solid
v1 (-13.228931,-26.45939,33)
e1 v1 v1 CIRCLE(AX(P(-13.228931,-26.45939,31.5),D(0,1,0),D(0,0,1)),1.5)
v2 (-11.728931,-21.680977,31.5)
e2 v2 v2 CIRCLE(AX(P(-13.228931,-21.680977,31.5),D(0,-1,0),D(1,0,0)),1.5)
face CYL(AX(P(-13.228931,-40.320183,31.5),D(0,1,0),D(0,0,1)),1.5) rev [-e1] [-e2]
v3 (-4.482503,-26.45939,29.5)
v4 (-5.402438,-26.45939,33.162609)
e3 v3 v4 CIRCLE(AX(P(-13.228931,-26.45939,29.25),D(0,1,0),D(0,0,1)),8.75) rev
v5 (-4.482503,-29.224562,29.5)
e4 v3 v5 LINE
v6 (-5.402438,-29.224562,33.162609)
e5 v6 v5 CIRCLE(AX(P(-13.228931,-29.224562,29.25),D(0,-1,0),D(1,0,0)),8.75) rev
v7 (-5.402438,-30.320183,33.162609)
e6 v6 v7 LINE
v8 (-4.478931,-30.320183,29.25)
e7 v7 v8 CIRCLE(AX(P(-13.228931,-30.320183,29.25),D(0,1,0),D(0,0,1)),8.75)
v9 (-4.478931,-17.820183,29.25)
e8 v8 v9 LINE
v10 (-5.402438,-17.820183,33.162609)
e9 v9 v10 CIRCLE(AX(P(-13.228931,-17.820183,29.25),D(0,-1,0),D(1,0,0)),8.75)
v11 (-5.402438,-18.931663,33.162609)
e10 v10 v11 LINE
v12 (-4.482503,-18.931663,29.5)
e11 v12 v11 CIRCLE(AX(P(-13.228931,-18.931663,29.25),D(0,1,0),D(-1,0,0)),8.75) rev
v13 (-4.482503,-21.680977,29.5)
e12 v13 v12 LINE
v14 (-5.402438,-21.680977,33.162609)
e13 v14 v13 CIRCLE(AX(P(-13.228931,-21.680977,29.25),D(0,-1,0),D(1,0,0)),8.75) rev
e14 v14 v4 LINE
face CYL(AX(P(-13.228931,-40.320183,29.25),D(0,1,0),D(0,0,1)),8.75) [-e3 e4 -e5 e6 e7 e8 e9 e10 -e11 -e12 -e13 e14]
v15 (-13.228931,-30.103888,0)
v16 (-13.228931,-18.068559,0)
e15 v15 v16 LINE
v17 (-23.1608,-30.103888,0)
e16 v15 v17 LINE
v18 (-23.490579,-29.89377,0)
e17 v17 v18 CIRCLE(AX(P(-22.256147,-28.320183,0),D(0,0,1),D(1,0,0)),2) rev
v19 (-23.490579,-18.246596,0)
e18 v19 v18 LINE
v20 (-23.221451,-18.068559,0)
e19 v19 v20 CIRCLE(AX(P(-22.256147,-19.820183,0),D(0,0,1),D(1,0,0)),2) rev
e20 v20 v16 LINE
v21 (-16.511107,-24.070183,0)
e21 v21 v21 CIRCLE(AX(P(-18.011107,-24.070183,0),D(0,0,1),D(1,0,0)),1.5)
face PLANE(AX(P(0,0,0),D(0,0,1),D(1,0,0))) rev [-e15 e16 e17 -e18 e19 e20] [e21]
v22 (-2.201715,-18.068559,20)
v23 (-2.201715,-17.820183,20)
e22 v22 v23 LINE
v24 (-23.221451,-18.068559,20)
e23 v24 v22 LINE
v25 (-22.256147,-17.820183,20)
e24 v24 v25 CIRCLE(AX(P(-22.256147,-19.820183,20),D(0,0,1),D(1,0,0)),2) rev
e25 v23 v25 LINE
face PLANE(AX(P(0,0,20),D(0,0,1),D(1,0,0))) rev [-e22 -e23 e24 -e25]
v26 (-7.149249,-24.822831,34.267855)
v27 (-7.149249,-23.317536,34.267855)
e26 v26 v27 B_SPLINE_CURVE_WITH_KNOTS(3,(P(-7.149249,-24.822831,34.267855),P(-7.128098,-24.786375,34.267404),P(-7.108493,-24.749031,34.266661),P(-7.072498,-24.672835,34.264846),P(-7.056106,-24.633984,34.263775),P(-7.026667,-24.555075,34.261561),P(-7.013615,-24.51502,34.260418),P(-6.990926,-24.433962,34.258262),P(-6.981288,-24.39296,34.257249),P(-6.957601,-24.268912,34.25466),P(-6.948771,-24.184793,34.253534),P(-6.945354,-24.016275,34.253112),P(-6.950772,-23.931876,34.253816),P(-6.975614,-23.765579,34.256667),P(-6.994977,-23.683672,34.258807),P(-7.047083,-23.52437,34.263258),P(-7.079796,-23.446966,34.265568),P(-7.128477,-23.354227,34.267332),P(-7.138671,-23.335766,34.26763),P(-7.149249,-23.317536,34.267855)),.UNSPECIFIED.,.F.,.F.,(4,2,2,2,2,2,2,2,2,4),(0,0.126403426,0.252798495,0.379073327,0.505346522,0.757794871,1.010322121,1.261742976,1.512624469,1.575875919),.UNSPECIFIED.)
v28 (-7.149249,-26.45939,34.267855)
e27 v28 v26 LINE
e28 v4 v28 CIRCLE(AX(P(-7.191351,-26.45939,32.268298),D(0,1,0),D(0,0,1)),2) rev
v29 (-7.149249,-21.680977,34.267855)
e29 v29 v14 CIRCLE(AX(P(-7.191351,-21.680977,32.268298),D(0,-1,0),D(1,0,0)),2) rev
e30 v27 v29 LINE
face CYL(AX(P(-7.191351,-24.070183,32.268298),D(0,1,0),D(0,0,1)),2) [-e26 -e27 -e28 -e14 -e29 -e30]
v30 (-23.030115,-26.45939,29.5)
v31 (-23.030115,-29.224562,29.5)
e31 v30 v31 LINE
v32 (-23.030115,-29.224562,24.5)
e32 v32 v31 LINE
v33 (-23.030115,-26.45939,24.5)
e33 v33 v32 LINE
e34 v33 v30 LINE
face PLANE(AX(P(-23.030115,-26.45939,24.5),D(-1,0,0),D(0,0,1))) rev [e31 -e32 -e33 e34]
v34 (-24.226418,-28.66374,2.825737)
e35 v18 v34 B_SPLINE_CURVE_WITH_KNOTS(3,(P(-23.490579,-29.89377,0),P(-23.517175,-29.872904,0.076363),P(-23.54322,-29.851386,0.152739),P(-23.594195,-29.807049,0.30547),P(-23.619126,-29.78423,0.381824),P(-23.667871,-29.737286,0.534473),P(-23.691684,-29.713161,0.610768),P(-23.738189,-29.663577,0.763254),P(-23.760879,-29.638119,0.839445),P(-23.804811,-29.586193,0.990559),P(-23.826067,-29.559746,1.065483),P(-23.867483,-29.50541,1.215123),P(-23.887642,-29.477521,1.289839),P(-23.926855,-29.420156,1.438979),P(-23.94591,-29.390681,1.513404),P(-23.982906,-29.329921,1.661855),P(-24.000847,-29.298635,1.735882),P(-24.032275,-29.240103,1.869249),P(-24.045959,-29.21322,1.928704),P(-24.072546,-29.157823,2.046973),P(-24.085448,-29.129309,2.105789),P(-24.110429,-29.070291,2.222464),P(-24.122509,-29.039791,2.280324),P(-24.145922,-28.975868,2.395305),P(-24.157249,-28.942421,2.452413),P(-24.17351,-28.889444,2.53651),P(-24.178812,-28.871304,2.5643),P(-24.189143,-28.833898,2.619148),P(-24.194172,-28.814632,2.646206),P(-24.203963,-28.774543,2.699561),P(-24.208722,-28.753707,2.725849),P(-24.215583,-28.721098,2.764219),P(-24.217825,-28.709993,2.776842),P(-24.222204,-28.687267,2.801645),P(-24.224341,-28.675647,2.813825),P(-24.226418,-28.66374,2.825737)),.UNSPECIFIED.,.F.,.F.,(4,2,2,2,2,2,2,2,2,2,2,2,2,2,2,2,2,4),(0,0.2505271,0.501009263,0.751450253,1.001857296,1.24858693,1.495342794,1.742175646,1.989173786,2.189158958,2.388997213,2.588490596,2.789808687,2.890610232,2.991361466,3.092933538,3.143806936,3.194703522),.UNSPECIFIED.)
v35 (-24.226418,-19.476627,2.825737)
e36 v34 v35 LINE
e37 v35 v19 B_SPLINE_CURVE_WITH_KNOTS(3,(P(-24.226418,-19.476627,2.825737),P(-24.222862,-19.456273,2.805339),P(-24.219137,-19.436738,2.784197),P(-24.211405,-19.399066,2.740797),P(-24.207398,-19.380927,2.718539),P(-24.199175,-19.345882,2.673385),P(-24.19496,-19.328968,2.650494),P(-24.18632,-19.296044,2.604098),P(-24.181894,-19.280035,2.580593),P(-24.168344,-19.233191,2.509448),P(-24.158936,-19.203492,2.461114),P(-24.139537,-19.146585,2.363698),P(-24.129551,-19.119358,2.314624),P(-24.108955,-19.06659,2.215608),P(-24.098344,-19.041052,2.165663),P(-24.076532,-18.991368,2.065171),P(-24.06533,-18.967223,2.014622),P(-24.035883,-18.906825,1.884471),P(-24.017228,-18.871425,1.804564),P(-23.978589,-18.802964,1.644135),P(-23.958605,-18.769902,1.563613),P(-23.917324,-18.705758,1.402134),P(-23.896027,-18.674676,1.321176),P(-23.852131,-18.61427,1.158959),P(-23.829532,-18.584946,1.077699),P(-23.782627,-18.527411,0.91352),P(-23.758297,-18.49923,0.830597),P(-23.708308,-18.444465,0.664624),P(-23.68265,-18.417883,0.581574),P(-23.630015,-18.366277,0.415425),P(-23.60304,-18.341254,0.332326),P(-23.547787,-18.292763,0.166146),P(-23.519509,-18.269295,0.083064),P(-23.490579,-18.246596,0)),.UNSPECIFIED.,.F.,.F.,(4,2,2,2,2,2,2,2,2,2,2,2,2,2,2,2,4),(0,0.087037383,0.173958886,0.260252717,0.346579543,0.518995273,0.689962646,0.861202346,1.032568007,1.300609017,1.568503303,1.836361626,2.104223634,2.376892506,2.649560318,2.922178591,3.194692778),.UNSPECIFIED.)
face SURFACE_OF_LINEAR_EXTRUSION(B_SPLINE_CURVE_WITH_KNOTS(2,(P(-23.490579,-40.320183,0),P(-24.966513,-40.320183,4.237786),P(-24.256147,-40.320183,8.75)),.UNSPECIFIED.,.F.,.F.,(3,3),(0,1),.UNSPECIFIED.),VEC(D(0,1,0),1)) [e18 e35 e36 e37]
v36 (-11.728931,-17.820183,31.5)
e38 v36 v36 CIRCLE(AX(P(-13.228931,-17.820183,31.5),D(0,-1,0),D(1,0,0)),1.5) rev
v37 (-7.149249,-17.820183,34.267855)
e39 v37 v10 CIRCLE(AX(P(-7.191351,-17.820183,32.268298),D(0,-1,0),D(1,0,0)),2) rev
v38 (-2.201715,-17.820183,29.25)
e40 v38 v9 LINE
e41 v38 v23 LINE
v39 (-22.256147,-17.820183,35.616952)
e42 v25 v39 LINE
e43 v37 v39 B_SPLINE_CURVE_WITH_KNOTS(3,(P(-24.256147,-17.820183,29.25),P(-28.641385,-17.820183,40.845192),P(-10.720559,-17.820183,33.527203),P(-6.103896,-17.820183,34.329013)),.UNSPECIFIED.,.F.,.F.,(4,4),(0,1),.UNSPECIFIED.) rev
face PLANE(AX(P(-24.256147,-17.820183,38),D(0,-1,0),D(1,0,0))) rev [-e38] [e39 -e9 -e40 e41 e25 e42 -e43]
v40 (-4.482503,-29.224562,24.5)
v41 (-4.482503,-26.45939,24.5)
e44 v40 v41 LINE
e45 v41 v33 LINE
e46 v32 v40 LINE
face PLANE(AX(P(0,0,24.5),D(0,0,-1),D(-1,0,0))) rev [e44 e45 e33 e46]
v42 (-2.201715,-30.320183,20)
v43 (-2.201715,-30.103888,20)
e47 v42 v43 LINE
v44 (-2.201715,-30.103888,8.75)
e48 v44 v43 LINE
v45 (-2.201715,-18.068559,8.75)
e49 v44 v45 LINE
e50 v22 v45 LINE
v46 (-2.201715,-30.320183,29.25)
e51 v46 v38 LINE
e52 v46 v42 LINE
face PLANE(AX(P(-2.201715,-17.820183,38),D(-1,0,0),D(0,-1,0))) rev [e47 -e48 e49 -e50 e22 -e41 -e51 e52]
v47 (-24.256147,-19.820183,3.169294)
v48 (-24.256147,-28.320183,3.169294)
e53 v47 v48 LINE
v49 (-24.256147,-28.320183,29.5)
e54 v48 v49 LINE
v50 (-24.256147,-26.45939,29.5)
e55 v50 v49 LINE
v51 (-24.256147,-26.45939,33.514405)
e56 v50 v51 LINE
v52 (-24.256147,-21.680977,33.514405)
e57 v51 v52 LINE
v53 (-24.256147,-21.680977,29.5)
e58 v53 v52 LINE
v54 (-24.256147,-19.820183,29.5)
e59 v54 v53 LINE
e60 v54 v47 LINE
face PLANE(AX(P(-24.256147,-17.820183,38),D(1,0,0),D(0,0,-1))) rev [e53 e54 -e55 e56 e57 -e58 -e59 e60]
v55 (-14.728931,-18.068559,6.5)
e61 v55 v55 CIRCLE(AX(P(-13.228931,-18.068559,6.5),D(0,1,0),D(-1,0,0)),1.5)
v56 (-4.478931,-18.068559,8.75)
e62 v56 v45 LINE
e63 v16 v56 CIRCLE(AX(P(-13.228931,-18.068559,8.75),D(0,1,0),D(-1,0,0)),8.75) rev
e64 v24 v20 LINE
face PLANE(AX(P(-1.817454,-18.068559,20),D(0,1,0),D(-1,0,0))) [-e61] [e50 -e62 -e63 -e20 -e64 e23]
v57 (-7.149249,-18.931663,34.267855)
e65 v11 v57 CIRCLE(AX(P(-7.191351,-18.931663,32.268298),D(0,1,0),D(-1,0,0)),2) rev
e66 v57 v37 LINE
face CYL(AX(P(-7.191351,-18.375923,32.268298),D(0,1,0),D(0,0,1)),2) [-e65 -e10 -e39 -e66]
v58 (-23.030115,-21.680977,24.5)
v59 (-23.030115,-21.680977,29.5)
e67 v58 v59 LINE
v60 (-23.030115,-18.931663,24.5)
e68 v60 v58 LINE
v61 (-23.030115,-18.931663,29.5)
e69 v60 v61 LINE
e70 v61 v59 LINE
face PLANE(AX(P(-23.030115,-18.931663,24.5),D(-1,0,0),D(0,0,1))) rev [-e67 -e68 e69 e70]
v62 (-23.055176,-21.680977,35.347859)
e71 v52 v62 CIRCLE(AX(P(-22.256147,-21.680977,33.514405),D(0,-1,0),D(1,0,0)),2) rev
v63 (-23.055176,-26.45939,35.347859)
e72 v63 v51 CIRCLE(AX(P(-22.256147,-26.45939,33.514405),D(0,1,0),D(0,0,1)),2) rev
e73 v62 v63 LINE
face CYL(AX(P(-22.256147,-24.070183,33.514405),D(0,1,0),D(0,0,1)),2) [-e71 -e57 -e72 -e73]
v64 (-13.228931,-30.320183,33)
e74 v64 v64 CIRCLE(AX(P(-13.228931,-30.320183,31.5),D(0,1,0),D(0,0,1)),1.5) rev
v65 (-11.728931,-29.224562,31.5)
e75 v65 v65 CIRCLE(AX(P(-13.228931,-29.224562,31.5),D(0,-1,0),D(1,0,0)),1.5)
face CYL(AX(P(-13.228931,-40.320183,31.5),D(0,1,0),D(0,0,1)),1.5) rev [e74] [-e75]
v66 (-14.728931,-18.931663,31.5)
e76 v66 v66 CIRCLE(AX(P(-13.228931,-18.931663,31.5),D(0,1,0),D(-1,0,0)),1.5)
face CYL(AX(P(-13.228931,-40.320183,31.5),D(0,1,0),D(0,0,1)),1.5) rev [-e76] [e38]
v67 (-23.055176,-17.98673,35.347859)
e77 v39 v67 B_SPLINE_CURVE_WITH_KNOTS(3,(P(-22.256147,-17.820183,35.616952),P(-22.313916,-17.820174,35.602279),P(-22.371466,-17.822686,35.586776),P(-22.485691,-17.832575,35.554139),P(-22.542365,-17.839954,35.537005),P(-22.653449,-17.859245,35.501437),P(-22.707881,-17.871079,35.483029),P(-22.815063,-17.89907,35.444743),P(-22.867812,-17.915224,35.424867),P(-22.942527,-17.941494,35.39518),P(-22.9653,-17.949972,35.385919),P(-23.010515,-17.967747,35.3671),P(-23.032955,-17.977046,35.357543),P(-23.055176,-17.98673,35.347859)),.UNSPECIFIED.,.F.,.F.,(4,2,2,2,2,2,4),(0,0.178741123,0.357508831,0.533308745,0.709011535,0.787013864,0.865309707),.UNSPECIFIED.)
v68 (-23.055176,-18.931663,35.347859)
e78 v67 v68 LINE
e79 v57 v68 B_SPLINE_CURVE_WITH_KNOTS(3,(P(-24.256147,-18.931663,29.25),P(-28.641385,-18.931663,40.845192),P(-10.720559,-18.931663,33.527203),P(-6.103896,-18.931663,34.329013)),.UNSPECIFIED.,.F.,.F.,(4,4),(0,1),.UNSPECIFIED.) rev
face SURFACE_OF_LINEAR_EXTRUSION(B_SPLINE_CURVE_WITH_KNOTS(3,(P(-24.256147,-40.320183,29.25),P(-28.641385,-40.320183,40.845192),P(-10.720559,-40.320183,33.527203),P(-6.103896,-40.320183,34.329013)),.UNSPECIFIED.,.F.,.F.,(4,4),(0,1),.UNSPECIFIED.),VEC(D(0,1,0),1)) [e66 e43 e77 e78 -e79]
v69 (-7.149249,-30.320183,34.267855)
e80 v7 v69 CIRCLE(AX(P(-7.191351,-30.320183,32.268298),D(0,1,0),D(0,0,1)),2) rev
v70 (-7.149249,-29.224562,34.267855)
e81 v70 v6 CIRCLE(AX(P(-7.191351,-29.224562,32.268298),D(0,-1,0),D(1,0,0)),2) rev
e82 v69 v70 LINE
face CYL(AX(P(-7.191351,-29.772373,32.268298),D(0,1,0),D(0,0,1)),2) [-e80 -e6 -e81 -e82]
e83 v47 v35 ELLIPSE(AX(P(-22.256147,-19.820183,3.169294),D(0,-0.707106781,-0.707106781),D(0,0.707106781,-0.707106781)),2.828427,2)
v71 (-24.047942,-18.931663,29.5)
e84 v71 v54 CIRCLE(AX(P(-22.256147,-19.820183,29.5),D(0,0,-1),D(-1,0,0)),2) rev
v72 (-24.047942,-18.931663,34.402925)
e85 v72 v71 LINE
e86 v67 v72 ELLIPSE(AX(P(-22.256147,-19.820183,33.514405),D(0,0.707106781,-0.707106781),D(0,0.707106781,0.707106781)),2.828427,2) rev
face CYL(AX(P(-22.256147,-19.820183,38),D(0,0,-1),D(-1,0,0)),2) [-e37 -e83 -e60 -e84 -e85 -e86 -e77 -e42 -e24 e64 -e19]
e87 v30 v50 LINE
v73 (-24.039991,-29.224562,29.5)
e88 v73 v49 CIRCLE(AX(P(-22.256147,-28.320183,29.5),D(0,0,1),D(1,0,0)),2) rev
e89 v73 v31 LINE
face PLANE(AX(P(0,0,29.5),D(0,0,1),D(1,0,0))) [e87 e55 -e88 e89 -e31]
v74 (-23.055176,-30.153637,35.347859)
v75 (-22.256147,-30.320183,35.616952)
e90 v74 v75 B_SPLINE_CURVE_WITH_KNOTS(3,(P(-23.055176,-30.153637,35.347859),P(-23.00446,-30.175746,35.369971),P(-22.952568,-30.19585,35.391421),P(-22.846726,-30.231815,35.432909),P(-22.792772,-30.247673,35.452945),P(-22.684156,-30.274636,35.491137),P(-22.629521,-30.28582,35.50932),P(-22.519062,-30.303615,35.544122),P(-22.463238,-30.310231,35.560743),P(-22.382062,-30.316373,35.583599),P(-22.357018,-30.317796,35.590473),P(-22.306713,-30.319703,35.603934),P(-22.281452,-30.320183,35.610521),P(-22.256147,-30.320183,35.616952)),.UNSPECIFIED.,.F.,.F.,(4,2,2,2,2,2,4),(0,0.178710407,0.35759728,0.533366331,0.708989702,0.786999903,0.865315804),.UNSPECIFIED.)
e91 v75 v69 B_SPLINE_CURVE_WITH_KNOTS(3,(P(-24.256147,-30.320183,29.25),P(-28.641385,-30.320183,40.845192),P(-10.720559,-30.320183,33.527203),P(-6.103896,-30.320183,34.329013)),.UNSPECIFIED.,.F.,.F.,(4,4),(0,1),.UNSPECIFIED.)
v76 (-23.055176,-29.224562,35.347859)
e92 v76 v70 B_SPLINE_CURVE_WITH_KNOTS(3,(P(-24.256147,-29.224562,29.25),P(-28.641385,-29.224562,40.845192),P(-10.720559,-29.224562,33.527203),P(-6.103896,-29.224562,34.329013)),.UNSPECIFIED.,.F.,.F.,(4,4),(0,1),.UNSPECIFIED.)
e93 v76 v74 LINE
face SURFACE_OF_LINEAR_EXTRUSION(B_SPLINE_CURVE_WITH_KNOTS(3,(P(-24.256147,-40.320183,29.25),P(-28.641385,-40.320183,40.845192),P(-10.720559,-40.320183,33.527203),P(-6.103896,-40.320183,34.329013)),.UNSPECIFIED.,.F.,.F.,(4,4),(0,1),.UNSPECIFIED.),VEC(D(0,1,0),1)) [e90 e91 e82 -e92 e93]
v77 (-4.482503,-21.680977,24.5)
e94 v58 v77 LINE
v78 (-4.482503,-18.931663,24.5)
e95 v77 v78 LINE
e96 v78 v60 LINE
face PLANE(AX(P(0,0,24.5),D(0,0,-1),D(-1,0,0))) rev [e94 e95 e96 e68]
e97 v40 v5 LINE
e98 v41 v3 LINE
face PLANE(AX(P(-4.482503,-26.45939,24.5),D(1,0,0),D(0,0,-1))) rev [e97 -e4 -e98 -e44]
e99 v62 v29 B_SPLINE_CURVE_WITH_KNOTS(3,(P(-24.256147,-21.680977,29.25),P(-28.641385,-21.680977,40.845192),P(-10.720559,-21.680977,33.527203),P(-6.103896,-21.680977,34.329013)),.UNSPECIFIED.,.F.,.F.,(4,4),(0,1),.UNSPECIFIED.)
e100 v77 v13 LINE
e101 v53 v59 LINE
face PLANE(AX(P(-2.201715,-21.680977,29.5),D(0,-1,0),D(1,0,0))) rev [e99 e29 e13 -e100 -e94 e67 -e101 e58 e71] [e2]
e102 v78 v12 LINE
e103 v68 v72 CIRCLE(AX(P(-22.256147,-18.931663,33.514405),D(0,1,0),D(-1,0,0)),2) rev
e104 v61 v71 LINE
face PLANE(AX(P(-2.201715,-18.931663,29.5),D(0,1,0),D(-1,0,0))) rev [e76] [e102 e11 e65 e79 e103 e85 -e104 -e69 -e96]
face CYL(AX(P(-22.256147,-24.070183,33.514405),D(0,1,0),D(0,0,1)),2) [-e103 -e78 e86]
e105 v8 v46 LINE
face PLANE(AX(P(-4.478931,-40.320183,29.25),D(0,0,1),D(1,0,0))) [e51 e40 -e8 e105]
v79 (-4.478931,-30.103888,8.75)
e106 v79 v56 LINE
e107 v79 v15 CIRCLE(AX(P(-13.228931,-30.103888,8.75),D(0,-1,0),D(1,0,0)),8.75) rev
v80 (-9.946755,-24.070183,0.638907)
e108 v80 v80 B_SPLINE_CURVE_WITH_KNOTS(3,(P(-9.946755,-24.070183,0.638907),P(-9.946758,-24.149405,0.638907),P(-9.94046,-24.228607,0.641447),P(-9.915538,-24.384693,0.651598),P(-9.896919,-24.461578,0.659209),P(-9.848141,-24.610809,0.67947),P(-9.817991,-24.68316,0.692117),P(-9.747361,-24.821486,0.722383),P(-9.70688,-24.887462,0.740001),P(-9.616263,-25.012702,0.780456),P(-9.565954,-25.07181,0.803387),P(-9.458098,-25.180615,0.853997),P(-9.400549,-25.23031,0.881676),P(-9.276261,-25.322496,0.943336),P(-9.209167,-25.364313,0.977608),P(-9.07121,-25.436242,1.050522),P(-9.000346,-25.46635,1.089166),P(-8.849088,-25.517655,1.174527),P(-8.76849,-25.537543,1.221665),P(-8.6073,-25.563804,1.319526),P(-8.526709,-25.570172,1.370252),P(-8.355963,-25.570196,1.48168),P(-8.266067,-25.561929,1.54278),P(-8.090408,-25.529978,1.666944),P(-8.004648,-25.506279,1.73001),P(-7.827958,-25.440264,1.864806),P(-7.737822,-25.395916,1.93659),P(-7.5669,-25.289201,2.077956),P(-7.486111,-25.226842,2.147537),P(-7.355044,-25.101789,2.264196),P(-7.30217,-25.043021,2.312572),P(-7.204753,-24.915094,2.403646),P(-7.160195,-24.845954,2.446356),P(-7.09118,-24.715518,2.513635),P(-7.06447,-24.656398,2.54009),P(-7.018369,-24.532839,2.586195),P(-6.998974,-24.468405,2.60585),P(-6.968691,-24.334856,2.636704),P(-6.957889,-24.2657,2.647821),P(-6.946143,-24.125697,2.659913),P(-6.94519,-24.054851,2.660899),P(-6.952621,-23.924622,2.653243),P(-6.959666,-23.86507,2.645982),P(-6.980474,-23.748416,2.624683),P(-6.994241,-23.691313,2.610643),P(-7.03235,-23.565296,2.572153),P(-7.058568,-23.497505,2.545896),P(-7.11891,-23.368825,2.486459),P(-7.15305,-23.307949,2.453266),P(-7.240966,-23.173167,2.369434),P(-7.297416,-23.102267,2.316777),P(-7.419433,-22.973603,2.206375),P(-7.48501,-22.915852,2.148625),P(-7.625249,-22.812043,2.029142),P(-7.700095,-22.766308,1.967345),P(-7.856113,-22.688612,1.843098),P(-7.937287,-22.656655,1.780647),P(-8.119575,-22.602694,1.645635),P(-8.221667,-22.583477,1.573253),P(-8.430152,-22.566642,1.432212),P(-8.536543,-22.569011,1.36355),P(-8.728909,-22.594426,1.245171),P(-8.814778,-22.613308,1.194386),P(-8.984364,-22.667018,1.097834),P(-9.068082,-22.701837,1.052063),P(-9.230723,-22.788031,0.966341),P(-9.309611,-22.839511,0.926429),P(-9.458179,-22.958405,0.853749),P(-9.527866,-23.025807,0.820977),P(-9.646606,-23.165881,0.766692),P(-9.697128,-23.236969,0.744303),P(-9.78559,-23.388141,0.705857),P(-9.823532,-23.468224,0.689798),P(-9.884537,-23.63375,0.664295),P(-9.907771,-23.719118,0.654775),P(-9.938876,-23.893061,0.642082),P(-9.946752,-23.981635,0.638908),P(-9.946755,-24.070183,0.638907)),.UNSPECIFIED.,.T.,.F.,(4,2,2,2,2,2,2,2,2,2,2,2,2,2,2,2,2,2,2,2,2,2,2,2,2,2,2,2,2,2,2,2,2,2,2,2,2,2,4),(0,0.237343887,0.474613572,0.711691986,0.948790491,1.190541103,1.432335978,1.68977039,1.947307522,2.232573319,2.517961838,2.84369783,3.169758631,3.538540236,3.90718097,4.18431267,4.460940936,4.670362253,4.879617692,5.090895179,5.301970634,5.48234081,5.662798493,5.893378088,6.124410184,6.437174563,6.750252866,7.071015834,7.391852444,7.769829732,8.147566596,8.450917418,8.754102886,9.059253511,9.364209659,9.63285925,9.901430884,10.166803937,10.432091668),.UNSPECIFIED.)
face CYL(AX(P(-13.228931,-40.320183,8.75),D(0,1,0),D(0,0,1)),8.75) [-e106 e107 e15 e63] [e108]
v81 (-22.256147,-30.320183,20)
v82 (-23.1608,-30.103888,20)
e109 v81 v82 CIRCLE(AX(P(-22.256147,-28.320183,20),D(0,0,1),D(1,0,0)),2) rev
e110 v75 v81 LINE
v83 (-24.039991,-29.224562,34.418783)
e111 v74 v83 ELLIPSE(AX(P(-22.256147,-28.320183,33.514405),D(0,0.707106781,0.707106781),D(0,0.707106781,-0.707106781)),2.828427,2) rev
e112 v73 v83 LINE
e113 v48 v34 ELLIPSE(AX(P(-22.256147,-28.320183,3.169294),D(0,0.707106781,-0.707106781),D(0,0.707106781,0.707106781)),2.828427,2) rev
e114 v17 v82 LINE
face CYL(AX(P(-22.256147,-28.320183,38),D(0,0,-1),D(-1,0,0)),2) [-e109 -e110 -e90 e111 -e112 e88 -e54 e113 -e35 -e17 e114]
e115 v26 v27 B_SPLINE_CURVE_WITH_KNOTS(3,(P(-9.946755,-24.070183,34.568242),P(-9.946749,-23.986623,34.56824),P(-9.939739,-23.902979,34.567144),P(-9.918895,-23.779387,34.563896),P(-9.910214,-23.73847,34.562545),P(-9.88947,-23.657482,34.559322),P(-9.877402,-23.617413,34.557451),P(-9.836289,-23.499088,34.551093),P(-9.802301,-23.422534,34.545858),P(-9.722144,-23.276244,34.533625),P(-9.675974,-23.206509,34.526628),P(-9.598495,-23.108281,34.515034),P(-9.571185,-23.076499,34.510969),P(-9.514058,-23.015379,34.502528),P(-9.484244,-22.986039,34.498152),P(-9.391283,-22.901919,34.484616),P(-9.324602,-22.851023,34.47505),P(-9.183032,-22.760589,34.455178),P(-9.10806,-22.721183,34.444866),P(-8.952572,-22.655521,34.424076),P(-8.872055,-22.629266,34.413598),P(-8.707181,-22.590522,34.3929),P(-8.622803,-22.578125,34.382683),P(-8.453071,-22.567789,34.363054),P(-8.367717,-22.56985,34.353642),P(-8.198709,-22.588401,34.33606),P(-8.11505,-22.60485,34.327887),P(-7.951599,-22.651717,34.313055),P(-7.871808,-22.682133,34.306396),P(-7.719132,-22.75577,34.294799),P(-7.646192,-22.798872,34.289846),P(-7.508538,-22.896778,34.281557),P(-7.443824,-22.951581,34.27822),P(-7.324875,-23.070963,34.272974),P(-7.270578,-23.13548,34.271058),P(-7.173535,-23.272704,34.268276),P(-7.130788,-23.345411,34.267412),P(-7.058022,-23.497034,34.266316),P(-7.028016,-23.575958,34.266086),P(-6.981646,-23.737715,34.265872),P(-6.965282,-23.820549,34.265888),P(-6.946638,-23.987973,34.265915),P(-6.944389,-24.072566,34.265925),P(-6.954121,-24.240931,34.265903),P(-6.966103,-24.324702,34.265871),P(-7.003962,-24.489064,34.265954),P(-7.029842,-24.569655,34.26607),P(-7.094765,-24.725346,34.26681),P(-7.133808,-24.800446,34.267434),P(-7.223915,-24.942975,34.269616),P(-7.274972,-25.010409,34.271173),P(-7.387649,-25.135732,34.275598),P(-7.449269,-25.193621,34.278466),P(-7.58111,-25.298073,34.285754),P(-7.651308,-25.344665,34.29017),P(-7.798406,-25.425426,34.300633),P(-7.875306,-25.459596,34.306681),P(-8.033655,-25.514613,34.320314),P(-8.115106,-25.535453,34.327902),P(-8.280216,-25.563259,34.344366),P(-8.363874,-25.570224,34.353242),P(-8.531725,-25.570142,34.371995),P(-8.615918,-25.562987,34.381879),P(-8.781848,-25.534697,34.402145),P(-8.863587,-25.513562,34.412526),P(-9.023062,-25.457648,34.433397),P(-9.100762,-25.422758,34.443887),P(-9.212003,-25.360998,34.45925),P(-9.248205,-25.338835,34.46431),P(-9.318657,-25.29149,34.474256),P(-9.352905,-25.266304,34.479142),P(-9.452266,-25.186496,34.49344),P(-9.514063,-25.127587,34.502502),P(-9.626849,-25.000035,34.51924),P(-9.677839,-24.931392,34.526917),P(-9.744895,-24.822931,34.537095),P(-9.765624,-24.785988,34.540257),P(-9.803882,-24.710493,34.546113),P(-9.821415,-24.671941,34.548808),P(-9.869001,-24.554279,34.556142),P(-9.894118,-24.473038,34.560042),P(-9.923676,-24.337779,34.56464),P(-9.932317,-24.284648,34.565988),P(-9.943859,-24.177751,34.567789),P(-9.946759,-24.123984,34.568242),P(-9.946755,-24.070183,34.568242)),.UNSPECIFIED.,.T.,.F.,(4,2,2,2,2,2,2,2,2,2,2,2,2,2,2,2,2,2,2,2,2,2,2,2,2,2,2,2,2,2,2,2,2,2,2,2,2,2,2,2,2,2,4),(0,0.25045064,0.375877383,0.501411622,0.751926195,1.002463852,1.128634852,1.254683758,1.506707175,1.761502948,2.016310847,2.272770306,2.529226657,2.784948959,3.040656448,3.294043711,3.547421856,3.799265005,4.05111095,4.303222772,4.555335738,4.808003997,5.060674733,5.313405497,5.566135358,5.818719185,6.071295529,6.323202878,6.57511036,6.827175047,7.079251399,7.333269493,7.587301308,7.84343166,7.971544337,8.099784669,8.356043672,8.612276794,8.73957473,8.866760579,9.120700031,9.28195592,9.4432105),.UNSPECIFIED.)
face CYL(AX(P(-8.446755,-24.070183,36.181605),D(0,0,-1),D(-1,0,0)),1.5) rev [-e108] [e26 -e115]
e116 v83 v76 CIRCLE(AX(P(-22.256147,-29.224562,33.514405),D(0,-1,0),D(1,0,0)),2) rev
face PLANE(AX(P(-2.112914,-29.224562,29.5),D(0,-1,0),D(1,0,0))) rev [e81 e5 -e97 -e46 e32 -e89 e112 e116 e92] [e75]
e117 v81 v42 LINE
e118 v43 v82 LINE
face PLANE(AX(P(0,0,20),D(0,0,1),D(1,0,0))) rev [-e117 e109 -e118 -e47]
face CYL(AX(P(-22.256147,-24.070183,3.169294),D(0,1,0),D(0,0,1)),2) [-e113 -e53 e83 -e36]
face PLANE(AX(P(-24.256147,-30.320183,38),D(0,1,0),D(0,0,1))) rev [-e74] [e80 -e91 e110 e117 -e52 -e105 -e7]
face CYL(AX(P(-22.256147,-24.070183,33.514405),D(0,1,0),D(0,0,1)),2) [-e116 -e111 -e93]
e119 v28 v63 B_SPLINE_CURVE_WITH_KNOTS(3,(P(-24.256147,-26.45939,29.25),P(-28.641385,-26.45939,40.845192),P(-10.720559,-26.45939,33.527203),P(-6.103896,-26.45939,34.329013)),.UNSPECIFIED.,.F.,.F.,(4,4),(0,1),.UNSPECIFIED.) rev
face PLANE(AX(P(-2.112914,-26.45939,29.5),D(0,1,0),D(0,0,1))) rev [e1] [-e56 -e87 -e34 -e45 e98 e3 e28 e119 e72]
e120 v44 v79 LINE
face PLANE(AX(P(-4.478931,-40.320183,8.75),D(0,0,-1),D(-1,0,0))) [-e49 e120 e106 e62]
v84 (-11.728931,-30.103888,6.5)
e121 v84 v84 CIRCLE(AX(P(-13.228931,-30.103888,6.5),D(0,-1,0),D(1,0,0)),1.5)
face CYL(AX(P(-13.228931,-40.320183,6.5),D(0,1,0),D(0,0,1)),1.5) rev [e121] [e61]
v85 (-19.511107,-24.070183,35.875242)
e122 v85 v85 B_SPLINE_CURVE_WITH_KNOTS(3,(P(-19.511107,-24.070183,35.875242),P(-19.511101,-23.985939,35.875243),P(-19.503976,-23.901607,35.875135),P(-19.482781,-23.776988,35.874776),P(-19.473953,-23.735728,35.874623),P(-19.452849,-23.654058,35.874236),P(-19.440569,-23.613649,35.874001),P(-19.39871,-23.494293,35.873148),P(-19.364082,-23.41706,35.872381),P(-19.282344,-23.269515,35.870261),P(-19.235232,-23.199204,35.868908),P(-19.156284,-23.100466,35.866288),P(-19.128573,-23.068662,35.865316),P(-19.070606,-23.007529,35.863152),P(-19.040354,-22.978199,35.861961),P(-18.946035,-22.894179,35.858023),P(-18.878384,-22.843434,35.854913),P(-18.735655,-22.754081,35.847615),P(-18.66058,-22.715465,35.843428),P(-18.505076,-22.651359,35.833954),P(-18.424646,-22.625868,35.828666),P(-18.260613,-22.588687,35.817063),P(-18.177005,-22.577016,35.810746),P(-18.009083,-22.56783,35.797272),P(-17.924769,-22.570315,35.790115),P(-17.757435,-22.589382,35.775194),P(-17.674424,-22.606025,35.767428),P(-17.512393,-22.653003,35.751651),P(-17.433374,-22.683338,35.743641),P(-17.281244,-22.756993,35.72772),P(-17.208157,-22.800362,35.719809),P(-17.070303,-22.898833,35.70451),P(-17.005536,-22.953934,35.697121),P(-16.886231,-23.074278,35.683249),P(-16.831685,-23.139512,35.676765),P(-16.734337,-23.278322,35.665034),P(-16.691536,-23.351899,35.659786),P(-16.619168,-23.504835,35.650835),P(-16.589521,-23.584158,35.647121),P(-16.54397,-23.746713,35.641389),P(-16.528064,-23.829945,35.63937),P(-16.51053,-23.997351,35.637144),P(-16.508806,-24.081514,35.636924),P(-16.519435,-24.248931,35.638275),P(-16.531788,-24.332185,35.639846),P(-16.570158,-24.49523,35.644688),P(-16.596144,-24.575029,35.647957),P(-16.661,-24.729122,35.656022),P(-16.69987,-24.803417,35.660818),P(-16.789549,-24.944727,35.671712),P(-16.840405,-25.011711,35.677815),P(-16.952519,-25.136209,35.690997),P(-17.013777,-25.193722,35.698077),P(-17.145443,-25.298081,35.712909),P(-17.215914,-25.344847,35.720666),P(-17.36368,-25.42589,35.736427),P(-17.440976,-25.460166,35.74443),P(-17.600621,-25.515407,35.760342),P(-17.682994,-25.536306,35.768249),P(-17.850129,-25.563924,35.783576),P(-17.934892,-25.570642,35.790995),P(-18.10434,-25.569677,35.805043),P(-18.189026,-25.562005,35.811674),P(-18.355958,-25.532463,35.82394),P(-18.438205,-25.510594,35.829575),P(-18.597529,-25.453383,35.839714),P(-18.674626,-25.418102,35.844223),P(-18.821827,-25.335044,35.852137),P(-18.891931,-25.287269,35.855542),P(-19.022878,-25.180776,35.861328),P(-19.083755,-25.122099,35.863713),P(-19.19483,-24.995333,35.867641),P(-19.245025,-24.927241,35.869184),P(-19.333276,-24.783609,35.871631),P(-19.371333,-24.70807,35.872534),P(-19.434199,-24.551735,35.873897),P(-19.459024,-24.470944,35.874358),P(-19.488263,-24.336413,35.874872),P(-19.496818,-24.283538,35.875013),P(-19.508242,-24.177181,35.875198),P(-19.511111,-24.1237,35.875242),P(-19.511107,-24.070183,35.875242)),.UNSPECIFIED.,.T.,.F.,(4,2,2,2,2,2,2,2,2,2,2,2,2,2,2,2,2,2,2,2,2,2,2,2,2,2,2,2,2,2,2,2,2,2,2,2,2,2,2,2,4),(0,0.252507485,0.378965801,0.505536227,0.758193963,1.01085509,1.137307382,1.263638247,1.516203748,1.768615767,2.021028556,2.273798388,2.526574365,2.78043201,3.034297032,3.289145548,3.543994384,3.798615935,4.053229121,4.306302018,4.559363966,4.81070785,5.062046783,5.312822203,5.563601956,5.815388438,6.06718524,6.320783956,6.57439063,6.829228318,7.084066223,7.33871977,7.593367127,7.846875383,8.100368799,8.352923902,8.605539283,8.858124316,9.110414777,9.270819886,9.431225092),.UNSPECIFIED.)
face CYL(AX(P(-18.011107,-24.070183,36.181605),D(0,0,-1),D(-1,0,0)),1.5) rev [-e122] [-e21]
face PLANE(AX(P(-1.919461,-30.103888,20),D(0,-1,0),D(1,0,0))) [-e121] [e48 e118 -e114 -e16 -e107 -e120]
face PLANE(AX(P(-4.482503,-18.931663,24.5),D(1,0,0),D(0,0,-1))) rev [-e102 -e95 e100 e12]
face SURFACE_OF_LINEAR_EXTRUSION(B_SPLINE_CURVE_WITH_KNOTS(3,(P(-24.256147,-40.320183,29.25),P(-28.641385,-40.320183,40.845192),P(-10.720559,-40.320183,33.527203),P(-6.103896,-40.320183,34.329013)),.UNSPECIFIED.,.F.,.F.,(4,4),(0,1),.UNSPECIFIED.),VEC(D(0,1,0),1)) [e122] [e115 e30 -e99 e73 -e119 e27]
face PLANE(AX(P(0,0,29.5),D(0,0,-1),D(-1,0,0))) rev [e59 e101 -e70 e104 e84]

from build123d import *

# Parameters (mm, degrees)
SKETCH1_W               = 22.054431489
SKETCH1_H               = 12.5
BOSS_EXTRUDE1_DEPTH     = 38
CUT_EXTRUDE1_DEPTH      = 10
CUT_EXTRUDE1_DEPTH_BACK = 15
SKETCH2_R               = 1.5
FILLET3_R               = 2
SKETCH5_R               = 1.5
CUT_EXTRUDE4_DEPTH      = 53.86644408
SKETCH16_W              = 22.05443149
SKETCH16_H              = 2.749314183
SKETCH16_W_2            = 22.143232671
SKETCH16_H_2            = 2.765172048
CUT_EXTRUDE6_DEPTH      = 8.5
FILLET4_R               = 2
SKETCH17_W              = 18.547612126
SKETCH17_H              = 2.749314183
SKETCH17_H_2            = 2.765172048
CUT_EXTRUDE7_DEPTH      = 5
SKETCH18_W              = 23.880033653
SKETCH18_H              = 0.742090051
SKETCH18_W_2            = 23.982039935
SKETCH18_H_2            = 0.706785536
CUT_EXTRUDE8_DEPTH      = 20


with BuildPart() as part:
    # Sketch1 → Boss-Extrude1 (new body)
    with BuildSketch(Plane.XY):
        with Locations((-13.228930986, -24.070183414)):
            Rectangle(SKETCH1_W, SKETCH1_H)
    extrude(amount=BOSS_EXTRUDE1_DEPTH)

    # Sketch2 → Cut-Extrude1 (cut, two sides: drawn at the far end of the back side and taken through both)
    with BuildSketch(Plane.XZ.offset(30.320183414).offset(-CUT_EXTRUDE1_DEPTH_BACK)):
        with Locations(Location((-13.228930986, 6.5, 0), (0, 0, 90))):
            Circle(SKETCH2_R)
        with Locations(Location((-13.228930986, 31.5, 0), (0, 0, 90))):
            Circle(SKETCH2_R)
        with BuildLine():
            Line((-4.478930986, 29.25), (-2.201715242, 29.25))
            add(Edge.make_bspline(
                [(-24.256146731, 29.25), (-34.277912729, 38.417119108), (-13.227499763, 50.308047167), (7.840407292, 38.416977249), (-2.201715242, 29.25)],
                knots=[0, 0, 0, 0, 0.49986218, 1, 1, 1, 1], degree=3))
            add(Edge.make_bspline(
                [(-6.103895584, 34.329012749), (-10.720559386, 33.527203043), (-28.641384523, 40.845191705), (-24.256146731, 29.25)],
                knots=[0, 0, 0, 0, 1, 1, 1, 1], degree=3))
            ThreePointArc((-6.103895584, 34.329012749), (-4.895067543, 31.916312081), (-4.478930986, 29.25))
        make_face()
        with BuildLine():
            Line((-4.478930986, 8.75), (-2.201715242, 8.75))
            add(Edge.make_bspline(
                [(-2.201715242, 8.75), (5.39210746, 3.880294823), (-0.777052631, -4.523329032), (-17.174300591, -10.623347238), (-34.821400648, -0.026005424), (-24.256146731, 8.75)],
                knots=[0, 0, 0, 0, 0.283272691, 0.504244858, 1, 1, 1, 1], degree=3))
            add(Edge.make_bspline(
                [(-23.490579314, 0), (-24.966512963, 4.237786421), (-24.256146731, 8.75)],
                knots=[0, 0, 0, 1, 1, 1], degree=2))
            Line((-23.490579314, 0), (-13.228930986, 0))
            ThreePointArc((-13.228930986, 0), (-7.041746651, 2.562815665), (-4.478930986, 8.75))
        make_face()
    extrude(amount=CUT_EXTRUDE1_DEPTH + CUT_EXTRUDE1_DEPTH_BACK, mode=Mode.SUBTRACT)

    # Fillet3
    # the kernel refuses this fillet: 2 mm, written as the material it takes off along each edge
    with BuildSketch(Plane(origin=(-24.256146731, -17.820183414, -5.498495188), x_dir=(1, 0, 0), z_dir=(0, 0, 1))) as fillet3_piece_1:
        with BuildLine():
            CenterArc((FILLET3_R, -FILLET3_R), FILLET3_R, 90, 90)
            Line((0, -FILLET3_R), (-FILLET3_R * 0.02, -FILLET3_R))
            Line((-FILLET3_R * 0.02, -FILLET3_R), (-FILLET3_R * 0.02, FILLET3_R * 0.02))
            Line((-FILLET3_R * 0.02, FILLET3_R * 0.02), (FILLET3_R, FILLET3_R * 0.02))
            Line((FILLET3_R, FILLET3_R * 0.02), (FILLET3_R, 0))
        make_face()
    extrude(amount=44.984872581, mode=Mode.SUBTRACT)
    with BuildSketch(Plane(origin=(-24.256146731, -30.320183414, -5.498495188), x_dir=(1, 0, 0), z_dir=(0, 0, 1))) as fillet3_piece_2:
        with BuildLine():
            CenterArc((FILLET3_R, FILLET3_R), FILLET3_R, 180, 90)
            Line((0, FILLET3_R), (-FILLET3_R * 0.02, FILLET3_R))
            Line((-FILLET3_R * 0.02, FILLET3_R), (-FILLET3_R * 0.02, -FILLET3_R * 0.02))
            Line((-FILLET3_R * 0.02, -FILLET3_R * 0.02), (FILLET3_R, -FILLET3_R * 0.02))
            Line((FILLET3_R, -FILLET3_R * 0.02), (FILLET3_R, 0))
        make_face()
    extrude(amount=44.984872581, mode=Mode.SUBTRACT)
    with BuildSketch(Plane(origin=(-24.256146731, -17.374523396, 3.001504812), x_dir=(0.16676818592575765, -1.261066300243152e-15, -0.9859961319209278), z_dir=(0, -1, 0))) as fillet3_piece_3:
        with BuildLine():
            CenterArc((0.168096911, 1.999974157), FILLET3_R, 260.400032587, 9.891234523)
            Line((-0.165439461, 0.027981894), (-0.172110188, -0.011457952))
            Line((-0.172110188, -0.011457952), (-0.006670727, -0.039439845))
            Line((-0.006670727, -0.039439845), (-0.00020343, -0.039999483))
            ThreePointArc((-0.00020343, -0.039999483), (0.089132026, -0.040226606), (0.178467349, -0.039999483))
            Line((0.178467349, -0.039999483), (0.178264007, 0))
        make_face()
    extrude(amount=13.391320036, mode=Mode.SUBTRACT)
    with BuildSketch(Plane(origin=(-24.256146731, -14.125185169, 34.486377393), x_dir=(0.8125654725305003, 0, 0.5828699279009725), z_dir=(0, -1, 0))) as fillet3_piece_4:
        with BuildLine():
            CenterArc((1.058597408, -1.955531144), FILLET3_R, 77.895172565, 66.452175148)
            Line((-0.566533537, -0.789791288), (-0.599036156, -0.766476491))
            Line((-0.599036156, -0.766476491), (-0.032502619, 0.023314797))
            Line((-0.032502619, 0.023314797), (-0.009827922, 0.038773856))
            ThreePointArc((-0.009827922, 0.038773856), (0.740246051, 0.125750941), (1.486387336, 0.039110623))
            Line((1.486387336, 0.039110623), (1.477999298, 0))
        make_face()
    extrude(amount=19.88999649, mode=Mode.SUBTRACT)

    # Sketch5 → Cut-Extrude4 (cut, through all)
    with BuildSketch(Plane.XY):
        with Locations(Location((-18.011106811, -24.070183414, 0), (0, 0, 180))):
            Circle(SKETCH5_R)
        with Locations(Location((-8.446755162, -24.070183414, 0), (0, 0, 180))):
            Circle(SKETCH5_R)
    extrude(amount=CUT_EXTRUDE4_DEPTH, mode=Mode.SUBTRACT)

    # Sketch16 → Cut-Extrude6 (cut)
    with BuildSketch(Plane.XY.offset(38)):
        with Locations((-13.228930985, -20.306320009)):
            Rectangle(SKETCH16_W, SKETCH16_H)
        with Locations((-13.184530395, -27.841975748)):
            Rectangle(SKETCH16_W_2, SKETCH16_H_2)
    extrude(amount=-CUT_EXTRUDE6_DEPTH, mode=Mode.SUBTRACT)

    # Fillet4
    # the kernel refuses this fillet: 2 mm, written as the material it takes off along each edge
    with BuildSketch(Plane(origin=(-6.103895584, -22.334365667, 34.329012749), x_dir=(0.515368054600745, 0, -0.8569689424343473), z_dir=(0, 1, 0))) as fillet4_piece_1:
        with BuildLine():
            CenterArc((1.205528974, 1.993941708), FILLET4_R, 212.228268917, 62.232476225)
            Line((-0.486331325, 0.927354287), (-0.520168531, 0.906022538))
            ThreePointArc((-0.520168531, 0.906022538), (-0.25689069, 0.456334761), (-0.037300681, -0.01444504))
            Line((-0.037300681, -0.01444504), (-0.003111043, -0.039878834))
            ThreePointArc((-0.003111043, -0.039878834), (0.68054055, -0.066505026), (1.364192143, -0.039878834))
            Line((1.364192143, -0.039878834), (1.3610811, 0))
        make_face()
    extrude(amount=7.916885004, mode=Mode.SUBTRACT)
    with BuildSketch(Plane(origin=(-6.103895584, -29.862092474, 34.329012749), x_dir=(0.515368054600745, 0, -0.8569689424343473), z_dir=(0, 1, 0))) as fillet4_piece_2:
        with BuildLine():
            CenterArc((1.205528974, 1.993941708), FILLET4_R, 212.228268917, 62.232476225)
            Line((-0.486331325, 0.927354287), (-0.520168531, 0.906022538))
            ThreePointArc((-0.520168531, 0.906022538), (-0.25689069, 0.456334761), (-0.037300681, -0.01444504))
            Line((-0.037300681, -0.01444504), (-0.003111043, -0.039878834))
            ThreePointArc((-0.003111043, -0.039878834), (0.68054055, -0.066505026), (1.364192143, -0.039878834))
            Line((1.364192143, -0.039878834), (1.3610811, 0))
        make_face()
    extrude(amount=11.583818124, mode=Mode.SUBTRACT)
    with BuildSketch(Plane(origin=(-6.103895584, -33.722886164, 34.329012749), x_dir=(0.515368054600745, 0, -0.8569689424343473), z_dir=(0, 1, 0))) as fillet4_piece_3:
        with BuildLine():
            CenterArc((1.205528974, 1.993941708), FILLET4_R, 212.228268917, 62.232476225)
            Line((-0.486331325, 0.927354287), (-0.520168531, 0.906022538))
            ThreePointArc((-0.520168531, 0.906022538), (-0.25689069, 0.456334761), (-0.037300681, -0.01444504))
            Line((-0.037300681, -0.01444504), (-0.003111043, -0.039878834))
            ThreePointArc((-0.003111043, -0.039878834), (0.68054055, -0.066505026), (1.364192143, -0.039878834))
            Line((1.364192143, -0.039878834), (1.3610811, 0))
        make_face()
    extrude(amount=7.901027143, mode=Mode.SUBTRACT)

    # Sketch17 → Cut-Extrude7 (cut)
    with BuildSketch(Plane.XY.offset(29.5)):
        with Locations((-13.756309207, -20.306320009)):
            Rectangle(SKETCH17_W, SKETCH17_H)
        with Locations((-13.756309207, -27.841975748)):
            Rectangle(SKETCH17_W, SKETCH17_H_2)
    extrude(amount=-CUT_EXTRUDE7_DEPTH, mode=Mode.SUBTRACT)

    # Sketch18 → Cut-Extrude8 (cut)
    with BuildSketch(Plane.XY):
        with Locations((-13.859477608, -30.474932984)):
            Rectangle(SKETCH18_W, SKETCH18_H)
        with Locations((-13.808474467, -17.715166293)):
            Rectangle(SKETCH18_W_2, SKETCH18_H_2)
    extrude(amount=CUT_EXTRUDE8_DEPTH, mode=Mode.SUBTRACT)


solid = part.part
